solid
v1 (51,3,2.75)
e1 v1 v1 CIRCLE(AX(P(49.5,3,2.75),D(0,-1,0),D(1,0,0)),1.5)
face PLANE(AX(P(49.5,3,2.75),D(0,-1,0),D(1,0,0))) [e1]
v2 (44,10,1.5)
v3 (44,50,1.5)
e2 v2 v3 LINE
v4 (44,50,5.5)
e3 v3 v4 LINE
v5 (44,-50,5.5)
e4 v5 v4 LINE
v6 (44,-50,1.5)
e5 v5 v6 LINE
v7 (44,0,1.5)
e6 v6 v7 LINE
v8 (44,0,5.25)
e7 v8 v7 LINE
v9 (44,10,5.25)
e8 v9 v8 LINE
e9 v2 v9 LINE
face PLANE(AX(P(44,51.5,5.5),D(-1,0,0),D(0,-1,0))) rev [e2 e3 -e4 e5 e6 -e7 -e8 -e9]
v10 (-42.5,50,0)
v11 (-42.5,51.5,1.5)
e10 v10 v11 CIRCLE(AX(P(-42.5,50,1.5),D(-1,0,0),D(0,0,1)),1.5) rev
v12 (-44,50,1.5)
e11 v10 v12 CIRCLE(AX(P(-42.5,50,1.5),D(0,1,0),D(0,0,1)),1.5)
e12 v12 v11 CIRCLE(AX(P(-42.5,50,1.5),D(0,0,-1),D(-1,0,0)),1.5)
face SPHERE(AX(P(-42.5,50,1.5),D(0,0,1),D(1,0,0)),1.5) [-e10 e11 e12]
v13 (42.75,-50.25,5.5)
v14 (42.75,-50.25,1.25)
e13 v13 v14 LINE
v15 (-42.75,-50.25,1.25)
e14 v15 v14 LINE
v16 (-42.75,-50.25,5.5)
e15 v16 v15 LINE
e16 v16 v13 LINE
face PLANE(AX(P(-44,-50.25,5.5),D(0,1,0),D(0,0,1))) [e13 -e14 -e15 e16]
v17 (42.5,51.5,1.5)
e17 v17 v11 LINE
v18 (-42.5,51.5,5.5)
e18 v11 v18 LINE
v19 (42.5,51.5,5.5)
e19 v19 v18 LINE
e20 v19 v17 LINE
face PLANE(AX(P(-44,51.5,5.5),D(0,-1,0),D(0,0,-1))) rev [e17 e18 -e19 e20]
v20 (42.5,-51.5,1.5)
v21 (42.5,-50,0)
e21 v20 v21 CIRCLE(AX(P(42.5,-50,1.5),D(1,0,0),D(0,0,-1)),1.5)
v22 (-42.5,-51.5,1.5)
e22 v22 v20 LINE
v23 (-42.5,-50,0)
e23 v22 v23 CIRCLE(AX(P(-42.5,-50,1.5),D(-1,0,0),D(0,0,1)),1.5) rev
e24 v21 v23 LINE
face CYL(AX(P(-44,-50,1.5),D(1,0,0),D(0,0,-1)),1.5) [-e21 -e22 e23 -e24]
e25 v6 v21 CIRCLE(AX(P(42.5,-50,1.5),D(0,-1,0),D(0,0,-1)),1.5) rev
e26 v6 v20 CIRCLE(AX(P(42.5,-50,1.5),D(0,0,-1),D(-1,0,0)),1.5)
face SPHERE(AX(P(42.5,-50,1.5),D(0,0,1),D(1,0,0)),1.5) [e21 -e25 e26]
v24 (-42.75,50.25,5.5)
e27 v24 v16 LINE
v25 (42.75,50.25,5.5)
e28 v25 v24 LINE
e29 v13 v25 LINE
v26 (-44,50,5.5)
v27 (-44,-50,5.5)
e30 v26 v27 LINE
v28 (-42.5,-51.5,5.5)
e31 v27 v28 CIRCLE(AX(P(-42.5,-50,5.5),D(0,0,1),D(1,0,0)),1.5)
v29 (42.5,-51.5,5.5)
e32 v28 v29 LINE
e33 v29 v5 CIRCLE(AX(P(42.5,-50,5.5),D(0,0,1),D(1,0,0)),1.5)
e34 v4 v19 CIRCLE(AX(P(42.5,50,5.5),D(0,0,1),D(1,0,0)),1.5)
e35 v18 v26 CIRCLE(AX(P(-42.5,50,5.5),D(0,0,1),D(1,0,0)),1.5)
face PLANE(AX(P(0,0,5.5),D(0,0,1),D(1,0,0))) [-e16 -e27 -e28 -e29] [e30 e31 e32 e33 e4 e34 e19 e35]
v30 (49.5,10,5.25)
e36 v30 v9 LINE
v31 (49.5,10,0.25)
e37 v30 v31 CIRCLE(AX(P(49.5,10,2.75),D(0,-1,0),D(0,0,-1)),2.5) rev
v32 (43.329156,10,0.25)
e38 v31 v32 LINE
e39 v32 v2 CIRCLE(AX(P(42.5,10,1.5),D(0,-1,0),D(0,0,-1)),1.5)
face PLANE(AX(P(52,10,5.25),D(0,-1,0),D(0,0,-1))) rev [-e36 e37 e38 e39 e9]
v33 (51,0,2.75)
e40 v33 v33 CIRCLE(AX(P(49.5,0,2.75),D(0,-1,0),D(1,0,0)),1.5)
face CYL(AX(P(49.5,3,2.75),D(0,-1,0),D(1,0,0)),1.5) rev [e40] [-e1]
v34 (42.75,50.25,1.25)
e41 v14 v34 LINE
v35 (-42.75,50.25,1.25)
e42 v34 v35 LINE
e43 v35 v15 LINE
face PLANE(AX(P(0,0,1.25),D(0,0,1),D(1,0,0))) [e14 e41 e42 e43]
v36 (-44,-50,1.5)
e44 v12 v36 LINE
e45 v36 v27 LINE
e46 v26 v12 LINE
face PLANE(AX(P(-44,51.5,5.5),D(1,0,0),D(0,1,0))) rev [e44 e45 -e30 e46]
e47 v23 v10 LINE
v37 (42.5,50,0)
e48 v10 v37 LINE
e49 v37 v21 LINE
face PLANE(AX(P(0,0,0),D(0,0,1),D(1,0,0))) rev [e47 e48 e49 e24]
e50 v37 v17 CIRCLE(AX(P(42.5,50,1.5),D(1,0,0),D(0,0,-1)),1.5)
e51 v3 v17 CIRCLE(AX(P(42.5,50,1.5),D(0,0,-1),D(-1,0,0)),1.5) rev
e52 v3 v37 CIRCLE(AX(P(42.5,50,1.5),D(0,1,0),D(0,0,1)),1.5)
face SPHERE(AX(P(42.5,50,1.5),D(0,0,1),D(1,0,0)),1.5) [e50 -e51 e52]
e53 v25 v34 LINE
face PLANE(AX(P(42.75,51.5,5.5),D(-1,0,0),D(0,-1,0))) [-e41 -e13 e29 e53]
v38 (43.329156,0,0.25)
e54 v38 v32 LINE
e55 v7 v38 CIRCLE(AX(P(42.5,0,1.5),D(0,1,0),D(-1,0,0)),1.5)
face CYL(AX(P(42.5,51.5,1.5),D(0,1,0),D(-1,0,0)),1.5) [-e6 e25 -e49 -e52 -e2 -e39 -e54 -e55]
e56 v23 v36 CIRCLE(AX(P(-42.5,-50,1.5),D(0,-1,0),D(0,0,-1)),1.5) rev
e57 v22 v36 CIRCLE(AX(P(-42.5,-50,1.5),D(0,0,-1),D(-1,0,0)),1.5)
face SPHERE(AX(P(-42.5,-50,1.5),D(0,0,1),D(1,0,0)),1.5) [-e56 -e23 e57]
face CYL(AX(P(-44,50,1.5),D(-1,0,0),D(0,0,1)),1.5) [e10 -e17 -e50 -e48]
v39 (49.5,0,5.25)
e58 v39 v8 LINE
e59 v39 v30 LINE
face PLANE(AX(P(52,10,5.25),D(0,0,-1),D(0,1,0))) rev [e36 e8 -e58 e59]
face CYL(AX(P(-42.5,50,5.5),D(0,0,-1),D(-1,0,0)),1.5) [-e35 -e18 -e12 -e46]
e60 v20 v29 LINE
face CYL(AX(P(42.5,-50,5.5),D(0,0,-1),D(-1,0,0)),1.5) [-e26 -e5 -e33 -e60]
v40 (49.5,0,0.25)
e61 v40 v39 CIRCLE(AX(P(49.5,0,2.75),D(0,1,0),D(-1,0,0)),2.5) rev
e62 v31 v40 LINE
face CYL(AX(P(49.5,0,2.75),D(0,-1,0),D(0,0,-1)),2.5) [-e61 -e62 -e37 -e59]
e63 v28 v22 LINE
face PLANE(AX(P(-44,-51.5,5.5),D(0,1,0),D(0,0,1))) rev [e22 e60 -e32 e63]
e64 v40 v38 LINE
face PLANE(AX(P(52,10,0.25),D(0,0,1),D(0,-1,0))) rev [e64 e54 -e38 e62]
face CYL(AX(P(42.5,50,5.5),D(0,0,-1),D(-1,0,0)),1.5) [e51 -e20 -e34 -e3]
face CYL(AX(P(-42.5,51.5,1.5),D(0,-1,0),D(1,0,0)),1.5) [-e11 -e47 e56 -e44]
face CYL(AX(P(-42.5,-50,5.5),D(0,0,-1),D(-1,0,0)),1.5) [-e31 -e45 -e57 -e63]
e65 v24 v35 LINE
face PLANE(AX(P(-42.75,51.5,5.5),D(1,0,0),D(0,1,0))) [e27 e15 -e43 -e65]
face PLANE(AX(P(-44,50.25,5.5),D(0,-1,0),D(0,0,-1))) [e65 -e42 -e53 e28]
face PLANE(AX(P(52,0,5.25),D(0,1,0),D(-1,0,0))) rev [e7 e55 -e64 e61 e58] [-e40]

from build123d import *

# Parameters (mm, degrees)
SKETCH1_W           = 88
SKETCH1_H           = 103
BOSS_EXTRUDE1_DEPTH = 5.5
SHELL1_T            = -1.25
SKETCH2_W           = 5
SKETCH2_H           = 10
BOSS_EXTRUDE2_DEPTH = 8
FILLET1_RADIUS      = 2.5
FILLET1_LENGTH      = 10
SKETCH3_R           = 1.5
CUT_EXTRUDE1_DEPTH  = 3
FILLET2_R           = 1.5


with BuildPart() as part:
    # Sketch1 → Boss-Extrude1 (new body)
    with BuildSketch(Plane.XY):
        Rectangle(SKETCH1_W, SKETCH1_H)
    extrude(amount=BOSS_EXTRUDE1_DEPTH)

    # Shell1
    shell1_openings = [part.faces().sort_by_distance(p)[0] for p in [
        (0, 0, 5.5),
    ]]
    offset(amount=SHELL1_T, openings=shell1_openings, kind=Kind.INTERSECTION)

    # Sketch2 → Boss-Extrude2 (add)
    with BuildSketch(Plane(origin=(44, 0, 0), x_dir=(0, 0, -1), z_dir=(1, 0, 0))):
        with Locations((-2.75, 5)):
            Rectangle(SKETCH2_W, SKETCH2_H)
    extrude(amount=BOSS_EXTRUDE2_DEPTH)

    # Fillet1: full round fillet: the end face becomes a half cylinder, R = half its width
    fillet1_face = Plane((52, 5, 2.75), x_dir=(0, 1, 0), z_dir=(1, 0, 0))  # on the end face: x along it, z out of the body
    fillet1_slab = fillet1_face.offset(-FILLET1_RADIUS / 2) * Box(FILLET1_LENGTH, 2 * FILLET1_RADIUS, FILLET1_RADIUS, mode=Mode.PRIVATE)  # the body's end, R deep
    fillet1_round = Plane((49.5, 5, 2.75), x_dir=(1, 0, 0), z_dir=(0, 1, 0)) * Cylinder(FILLET1_RADIUS, FILLET1_LENGTH, mode=Mode.PRIVATE)  # its axis R under the face
    add(fillet1_slab - fillet1_round, mode=Mode.SUBTRACT)

    # Sketch3 → Cut-Extrude1 (cut)
    with BuildSketch(Plane.XZ):
        with Locations((49.5, 2.75)):
            Circle(SKETCH3_R)
    extrude(amount=-CUT_EXTRUDE1_DEPTH, mode=Mode.SUBTRACT)

    # Fillet2
    # the kernel refuses this fillet: 1.5 mm, written as the material it takes off along each edge
    with BuildSketch(Plane(origin=(-42.5, -50, 1.5), x_dir=(0, 0, -1), z_dir=(-1, 0, 0))) as fillet2_piece_1_section:
        Polygon((0, 0), (FILLET2_R, 0), (FILLET2_R, FILLET2_R), (0, FILLET2_R), align=None)
    fillet2_piece_1 = extrude(amount=FILLET2_R, mode=Mode.PRIVATE)
    fillet2_piece_1 = fillet2_piece_1 - Plane(origin=(-42.5, -50, 1.5), x_dir=(0, 0.7071067811865475, 0.7071067811865475), z_dir=(-1, 0, 0)) * Sphere(FILLET2_R, mode=Mode.PRIVATE)
    add(fillet2_piece_1, mode=Mode.SUBTRACT)
    with BuildSketch(Plane(origin=(-42.5, 50, 1.5), x_dir=(-1, 0, 0), z_dir=(0, 1, 0))) as fillet2_piece_2_section:
        Polygon((0, 0), (FILLET2_R, 0), (FILLET2_R, -FILLET2_R), (0, -FILLET2_R), align=None)
    fillet2_piece_2 = extrude(amount=FILLET2_R, mode=Mode.PRIVATE)
    fillet2_piece_2 = fillet2_piece_2 - Plane(origin=(-42.5, 50, 1.5), x_dir=(0.7071067811865475, 0, 0.7071067811865475), z_dir=(0, 1, 0)) * Sphere(FILLET2_R, mode=Mode.PRIVATE)
    add(fillet2_piece_2, mode=Mode.SUBTRACT)
    with BuildSketch(Plane(origin=(42.5, -50, 1.5), x_dir=(0, 0, -1), z_dir=(1, 0, 0))) as fillet2_piece_3_section:
        Polygon((0, 0), (FILLET2_R, 0), (FILLET2_R, -FILLET2_R), (0, -FILLET2_R), align=None)
    fillet2_piece_3 = extrude(amount=FILLET2_R, mode=Mode.PRIVATE)
    fillet2_piece_3 = fillet2_piece_3 - Plane(origin=(42.5, -50, 1.5), x_dir=(0, 0.7071067811865475, 0.7071067811865475), z_dir=(1, 0, 0)) * Sphere(FILLET2_R, mode=Mode.PRIVATE)
    add(fillet2_piece_3, mode=Mode.SUBTRACT)
    with BuildSketch(Plane(origin=(42.5, 50, 1.5), x_dir=(1, 0, 0), z_dir=(0, 1, 0))) as fillet2_piece_4_section:
        Polygon((0, 0), (FILLET2_R, 0), (FILLET2_R, FILLET2_R), (0, FILLET2_R), align=None)
    fillet2_piece_4 = extrude(amount=FILLET2_R, mode=Mode.PRIVATE)
    fillet2_piece_4 = fillet2_piece_4 - Plane(origin=(42.5, 50, 1.5), x_dir=(-0.7071067811865475, 0, 0.7071067811865475), z_dir=(0, 1, 0)) * Sphere(FILLET2_R, mode=Mode.PRIVATE)
    add(fillet2_piece_4, mode=Mode.SUBTRACT)
    with BuildSketch(Plane(origin=(-44, -50, 0), x_dir=(0, 0, 1), z_dir=(0, 1, 0))) as fillet2_piece_5:
        with BuildLine():
            CenterArc((FILLET2_R, FILLET2_R), FILLET2_R, 180, 90)
            Line((0, FILLET2_R), (0, 0))
            Line((0, 0), (FILLET2_R, 0))
        make_face()
    extrude(amount=100, mode=Mode.SUBTRACT)
    with BuildSketch(Plane(origin=(42.5, -51.5, 0), x_dir=(0, 1, 0), z_dir=(-1, 0, 0))) as fillet2_piece_6:
        with BuildLine():
            CenterArc((FILLET2_R, -FILLET2_R), FILLET2_R, 90, 90)
            Line((0, -FILLET2_R), (0, 0))
            Line((0, 0), (FILLET2_R, 0))
        make_face()
    extrude(amount=85, mode=Mode.SUBTRACT)
    with BuildSketch(Plane(origin=(44, 50, 0), x_dir=(0, 0, 1), z_dir=(0, -1, 0))) as fillet2_piece_7_section:
        with BuildLine():
            CenterArc((FILLET2_R, FILLET2_R), FILLET2_R, 180, 90)
            Line((0, FILLET2_R), (0, 0))
            Line((0, 0), (FILLET2_R, 0))
        make_face()
    fillet2_piece_7 = extrude(amount=100, mode=Mode.PRIVATE)
    fillet2_piece_7 = split(fillet2_piece_7, bisect_by=Plane(origin=(43.836700162, 30, 0.25), z_dir=(0, 0, 1)), keep=Keep.TOP, mode=Mode.PRIVATE)
    fillet2_piece_7 = split(fillet2_piece_7, bisect_by=Plane(origin=(43.836700162, 10, 0.589852414), z_dir=(0, 1, 0)), keep=Keep.TOP, mode=Mode.PRIVATE)
    add(fillet2_piece_7, mode=Mode.SUBTRACT)
    with BuildSketch(Plane(origin=(44, 50, 0), x_dir=(0, 0, 1), z_dir=(0, -1, 0))) as fillet2_piece_8_section:
        with BuildLine():
            CenterArc((FILLET2_R, FILLET2_R), FILLET2_R, 180, 90)
            Line((0, FILLET2_R), (0, 0))
            Line((0, 0), (FILLET2_R, 0))
        make_face()
    fillet2_piece_8 = extrude(amount=100, mode=Mode.PRIVATE)
    fillet2_piece_8 = split(fillet2_piece_8, bisect_by=Plane(origin=(43.48515527, 30, 0.25), z_dir=(0, 0, -1)), keep=Keep.TOP, mode=Mode.PRIVATE)
    fillet2_piece_8 = split(fillet2_piece_8, bisect_by=Plane(origin=(43.48515527, 10, 0.09081038), z_dir=(0, 1, 0)), keep=Keep.TOP, mode=Mode.PRIVATE)
    add(fillet2_piece_8, mode=Mode.SUBTRACT)
    with BuildSketch(Plane(origin=(44, 50, 0), x_dir=(0, 0, 1), z_dir=(0, -1, 0))) as fillet2_piece_9_section:
        with BuildLine():
            CenterArc((FILLET2_R, FILLET2_R), FILLET2_R, 180, 90)
            Line((0, FILLET2_R), (0, 0))
            Line((0, 0), (FILLET2_R, 0))
        make_face()
    fillet2_piece_9 = extrude(amount=100, mode=Mode.PRIVATE)
    fillet2_piece_9 = split(fillet2_piece_9, bisect_by=Plane(origin=(43.48515527, 0, 0.09081038), z_dir=(0, 1, 0)), keep=Keep.TOP, mode=Mode.PRIVATE)
    fillet2_piece_9 = split(fillet2_piece_9, bisect_by=Plane(origin=(43.48515527, 5, 0.25), z_dir=(0, 0, -1)), keep=Keep.TOP, mode=Mode.PRIVATE)
    fillet2_piece_9 = split(fillet2_piece_9, bisect_by=Plane(origin=(43.48515527, 10, 0.09081038), z_dir=(0, -1, 0)), keep=Keep.TOP, mode=Mode.PRIVATE)
    add(fillet2_piece_9, mode=Mode.SUBTRACT)
    with BuildSketch(Plane(origin=(44, 50, 0), x_dir=(0, 0, 1), z_dir=(0, -1, 0))) as fillet2_piece_10_section:
        with BuildLine():
            CenterArc((FILLET2_R, FILLET2_R), FILLET2_R, 180, 90)
            Line((0, FILLET2_R), (0, 0))
            Line((0, 0), (FILLET2_R, 0))
        make_face()
    fillet2_piece_10 = extrude(amount=100, mode=Mode.PRIVATE)
    fillet2_piece_10 = split(fillet2_piece_10, bisect_by=Plane(origin=(43.836700162, 0, 0.589852414), z_dir=(0, -1, 0)), keep=Keep.TOP, mode=Mode.PRIVATE)
    fillet2_piece_10 = split(fillet2_piece_10, bisect_by=Plane(origin=(43.836700162, -25, 0.25), z_dir=(0, 0, 1)), keep=Keep.TOP, mode=Mode.PRIVATE)
    add(fillet2_piece_10, mode=Mode.SUBTRACT)
    with BuildSketch(Plane(origin=(44, 50, 0), x_dir=(0, 0, 1), z_dir=(0, -1, 0))) as fillet2_piece_11_section:
        with BuildLine():
            CenterArc((FILLET2_R, FILLET2_R), FILLET2_R, 180, 90)
            Line((0, FILLET2_R), (0, 0))
            Line((0, 0), (FILLET2_R, 0))
        make_face()
    fillet2_piece_11 = extrude(amount=100, mode=Mode.PRIVATE)
    fillet2_piece_11 = split(fillet2_piece_11, bisect_by=Plane(origin=(43.48515527, 0, 0.09081038), z_dir=(0, -1, 0)), keep=Keep.TOP, mode=Mode.PRIVATE)
    fillet2_piece_11 = split(fillet2_piece_11, bisect_by=Plane(origin=(43.48515527, -25, 0.25), z_dir=(0, 0, -1)), keep=Keep.TOP, mode=Mode.PRIVATE)
    add(fillet2_piece_11, mode=Mode.SUBTRACT)
    with BuildSketch(Plane(origin=(-42.5, 51.5, 0), x_dir=(0, 0, 1), z_dir=(1, 0, 0))) as fillet2_piece_12:
        with BuildLine():
            CenterArc((FILLET2_R, FILLET2_R), FILLET2_R, 180, 90)
            Line((0, FILLET2_R), (0, 0))
            Line((0, 0), (FILLET2_R, 0))
        make_face()
    extrude(amount=85, mode=Mode.SUBTRACT)
    with BuildSketch(Plane(origin=(44, 51.5, 1.5), x_dir=(-1, 0, 0), z_dir=(0, 0, 1)), Plane(origin=(44, -51.5, 1.5), x_dir=(0, 1, 0), z_dir=(0, 0, 1))) as fillet2_piece_13:
        with BuildLine():
            CenterArc((FILLET2_R, FILLET2_R), FILLET2_R, 180, 90)
            Line((0, FILLET2_R), (0, 0))
            Line((0, 0), (FILLET2_R, 0))
        make_face()
    extrude(amount=7.75, mode=Mode.SUBTRACT)
    with BuildSketch(Plane(origin=(-44, -51.5, 1.5), x_dir=(0, 1, 0), z_dir=(0, 0, 1)), Plane(origin=(-44, 51.5, 1.5), x_dir=(1, 0, 0), z_dir=(0, 0, 1))) as fillet2_piece_14:
        with BuildLine():
            CenterArc((FILLET2_R, -FILLET2_R), FILLET2_R, 90, 90)
            Line((0, -FILLET2_R), (0, 0))
            Line((0, 0), (FILLET2_R, 0))
        make_face()
    extrude(amount=7.75, mode=Mode.SUBTRACT)


solid = part.part
